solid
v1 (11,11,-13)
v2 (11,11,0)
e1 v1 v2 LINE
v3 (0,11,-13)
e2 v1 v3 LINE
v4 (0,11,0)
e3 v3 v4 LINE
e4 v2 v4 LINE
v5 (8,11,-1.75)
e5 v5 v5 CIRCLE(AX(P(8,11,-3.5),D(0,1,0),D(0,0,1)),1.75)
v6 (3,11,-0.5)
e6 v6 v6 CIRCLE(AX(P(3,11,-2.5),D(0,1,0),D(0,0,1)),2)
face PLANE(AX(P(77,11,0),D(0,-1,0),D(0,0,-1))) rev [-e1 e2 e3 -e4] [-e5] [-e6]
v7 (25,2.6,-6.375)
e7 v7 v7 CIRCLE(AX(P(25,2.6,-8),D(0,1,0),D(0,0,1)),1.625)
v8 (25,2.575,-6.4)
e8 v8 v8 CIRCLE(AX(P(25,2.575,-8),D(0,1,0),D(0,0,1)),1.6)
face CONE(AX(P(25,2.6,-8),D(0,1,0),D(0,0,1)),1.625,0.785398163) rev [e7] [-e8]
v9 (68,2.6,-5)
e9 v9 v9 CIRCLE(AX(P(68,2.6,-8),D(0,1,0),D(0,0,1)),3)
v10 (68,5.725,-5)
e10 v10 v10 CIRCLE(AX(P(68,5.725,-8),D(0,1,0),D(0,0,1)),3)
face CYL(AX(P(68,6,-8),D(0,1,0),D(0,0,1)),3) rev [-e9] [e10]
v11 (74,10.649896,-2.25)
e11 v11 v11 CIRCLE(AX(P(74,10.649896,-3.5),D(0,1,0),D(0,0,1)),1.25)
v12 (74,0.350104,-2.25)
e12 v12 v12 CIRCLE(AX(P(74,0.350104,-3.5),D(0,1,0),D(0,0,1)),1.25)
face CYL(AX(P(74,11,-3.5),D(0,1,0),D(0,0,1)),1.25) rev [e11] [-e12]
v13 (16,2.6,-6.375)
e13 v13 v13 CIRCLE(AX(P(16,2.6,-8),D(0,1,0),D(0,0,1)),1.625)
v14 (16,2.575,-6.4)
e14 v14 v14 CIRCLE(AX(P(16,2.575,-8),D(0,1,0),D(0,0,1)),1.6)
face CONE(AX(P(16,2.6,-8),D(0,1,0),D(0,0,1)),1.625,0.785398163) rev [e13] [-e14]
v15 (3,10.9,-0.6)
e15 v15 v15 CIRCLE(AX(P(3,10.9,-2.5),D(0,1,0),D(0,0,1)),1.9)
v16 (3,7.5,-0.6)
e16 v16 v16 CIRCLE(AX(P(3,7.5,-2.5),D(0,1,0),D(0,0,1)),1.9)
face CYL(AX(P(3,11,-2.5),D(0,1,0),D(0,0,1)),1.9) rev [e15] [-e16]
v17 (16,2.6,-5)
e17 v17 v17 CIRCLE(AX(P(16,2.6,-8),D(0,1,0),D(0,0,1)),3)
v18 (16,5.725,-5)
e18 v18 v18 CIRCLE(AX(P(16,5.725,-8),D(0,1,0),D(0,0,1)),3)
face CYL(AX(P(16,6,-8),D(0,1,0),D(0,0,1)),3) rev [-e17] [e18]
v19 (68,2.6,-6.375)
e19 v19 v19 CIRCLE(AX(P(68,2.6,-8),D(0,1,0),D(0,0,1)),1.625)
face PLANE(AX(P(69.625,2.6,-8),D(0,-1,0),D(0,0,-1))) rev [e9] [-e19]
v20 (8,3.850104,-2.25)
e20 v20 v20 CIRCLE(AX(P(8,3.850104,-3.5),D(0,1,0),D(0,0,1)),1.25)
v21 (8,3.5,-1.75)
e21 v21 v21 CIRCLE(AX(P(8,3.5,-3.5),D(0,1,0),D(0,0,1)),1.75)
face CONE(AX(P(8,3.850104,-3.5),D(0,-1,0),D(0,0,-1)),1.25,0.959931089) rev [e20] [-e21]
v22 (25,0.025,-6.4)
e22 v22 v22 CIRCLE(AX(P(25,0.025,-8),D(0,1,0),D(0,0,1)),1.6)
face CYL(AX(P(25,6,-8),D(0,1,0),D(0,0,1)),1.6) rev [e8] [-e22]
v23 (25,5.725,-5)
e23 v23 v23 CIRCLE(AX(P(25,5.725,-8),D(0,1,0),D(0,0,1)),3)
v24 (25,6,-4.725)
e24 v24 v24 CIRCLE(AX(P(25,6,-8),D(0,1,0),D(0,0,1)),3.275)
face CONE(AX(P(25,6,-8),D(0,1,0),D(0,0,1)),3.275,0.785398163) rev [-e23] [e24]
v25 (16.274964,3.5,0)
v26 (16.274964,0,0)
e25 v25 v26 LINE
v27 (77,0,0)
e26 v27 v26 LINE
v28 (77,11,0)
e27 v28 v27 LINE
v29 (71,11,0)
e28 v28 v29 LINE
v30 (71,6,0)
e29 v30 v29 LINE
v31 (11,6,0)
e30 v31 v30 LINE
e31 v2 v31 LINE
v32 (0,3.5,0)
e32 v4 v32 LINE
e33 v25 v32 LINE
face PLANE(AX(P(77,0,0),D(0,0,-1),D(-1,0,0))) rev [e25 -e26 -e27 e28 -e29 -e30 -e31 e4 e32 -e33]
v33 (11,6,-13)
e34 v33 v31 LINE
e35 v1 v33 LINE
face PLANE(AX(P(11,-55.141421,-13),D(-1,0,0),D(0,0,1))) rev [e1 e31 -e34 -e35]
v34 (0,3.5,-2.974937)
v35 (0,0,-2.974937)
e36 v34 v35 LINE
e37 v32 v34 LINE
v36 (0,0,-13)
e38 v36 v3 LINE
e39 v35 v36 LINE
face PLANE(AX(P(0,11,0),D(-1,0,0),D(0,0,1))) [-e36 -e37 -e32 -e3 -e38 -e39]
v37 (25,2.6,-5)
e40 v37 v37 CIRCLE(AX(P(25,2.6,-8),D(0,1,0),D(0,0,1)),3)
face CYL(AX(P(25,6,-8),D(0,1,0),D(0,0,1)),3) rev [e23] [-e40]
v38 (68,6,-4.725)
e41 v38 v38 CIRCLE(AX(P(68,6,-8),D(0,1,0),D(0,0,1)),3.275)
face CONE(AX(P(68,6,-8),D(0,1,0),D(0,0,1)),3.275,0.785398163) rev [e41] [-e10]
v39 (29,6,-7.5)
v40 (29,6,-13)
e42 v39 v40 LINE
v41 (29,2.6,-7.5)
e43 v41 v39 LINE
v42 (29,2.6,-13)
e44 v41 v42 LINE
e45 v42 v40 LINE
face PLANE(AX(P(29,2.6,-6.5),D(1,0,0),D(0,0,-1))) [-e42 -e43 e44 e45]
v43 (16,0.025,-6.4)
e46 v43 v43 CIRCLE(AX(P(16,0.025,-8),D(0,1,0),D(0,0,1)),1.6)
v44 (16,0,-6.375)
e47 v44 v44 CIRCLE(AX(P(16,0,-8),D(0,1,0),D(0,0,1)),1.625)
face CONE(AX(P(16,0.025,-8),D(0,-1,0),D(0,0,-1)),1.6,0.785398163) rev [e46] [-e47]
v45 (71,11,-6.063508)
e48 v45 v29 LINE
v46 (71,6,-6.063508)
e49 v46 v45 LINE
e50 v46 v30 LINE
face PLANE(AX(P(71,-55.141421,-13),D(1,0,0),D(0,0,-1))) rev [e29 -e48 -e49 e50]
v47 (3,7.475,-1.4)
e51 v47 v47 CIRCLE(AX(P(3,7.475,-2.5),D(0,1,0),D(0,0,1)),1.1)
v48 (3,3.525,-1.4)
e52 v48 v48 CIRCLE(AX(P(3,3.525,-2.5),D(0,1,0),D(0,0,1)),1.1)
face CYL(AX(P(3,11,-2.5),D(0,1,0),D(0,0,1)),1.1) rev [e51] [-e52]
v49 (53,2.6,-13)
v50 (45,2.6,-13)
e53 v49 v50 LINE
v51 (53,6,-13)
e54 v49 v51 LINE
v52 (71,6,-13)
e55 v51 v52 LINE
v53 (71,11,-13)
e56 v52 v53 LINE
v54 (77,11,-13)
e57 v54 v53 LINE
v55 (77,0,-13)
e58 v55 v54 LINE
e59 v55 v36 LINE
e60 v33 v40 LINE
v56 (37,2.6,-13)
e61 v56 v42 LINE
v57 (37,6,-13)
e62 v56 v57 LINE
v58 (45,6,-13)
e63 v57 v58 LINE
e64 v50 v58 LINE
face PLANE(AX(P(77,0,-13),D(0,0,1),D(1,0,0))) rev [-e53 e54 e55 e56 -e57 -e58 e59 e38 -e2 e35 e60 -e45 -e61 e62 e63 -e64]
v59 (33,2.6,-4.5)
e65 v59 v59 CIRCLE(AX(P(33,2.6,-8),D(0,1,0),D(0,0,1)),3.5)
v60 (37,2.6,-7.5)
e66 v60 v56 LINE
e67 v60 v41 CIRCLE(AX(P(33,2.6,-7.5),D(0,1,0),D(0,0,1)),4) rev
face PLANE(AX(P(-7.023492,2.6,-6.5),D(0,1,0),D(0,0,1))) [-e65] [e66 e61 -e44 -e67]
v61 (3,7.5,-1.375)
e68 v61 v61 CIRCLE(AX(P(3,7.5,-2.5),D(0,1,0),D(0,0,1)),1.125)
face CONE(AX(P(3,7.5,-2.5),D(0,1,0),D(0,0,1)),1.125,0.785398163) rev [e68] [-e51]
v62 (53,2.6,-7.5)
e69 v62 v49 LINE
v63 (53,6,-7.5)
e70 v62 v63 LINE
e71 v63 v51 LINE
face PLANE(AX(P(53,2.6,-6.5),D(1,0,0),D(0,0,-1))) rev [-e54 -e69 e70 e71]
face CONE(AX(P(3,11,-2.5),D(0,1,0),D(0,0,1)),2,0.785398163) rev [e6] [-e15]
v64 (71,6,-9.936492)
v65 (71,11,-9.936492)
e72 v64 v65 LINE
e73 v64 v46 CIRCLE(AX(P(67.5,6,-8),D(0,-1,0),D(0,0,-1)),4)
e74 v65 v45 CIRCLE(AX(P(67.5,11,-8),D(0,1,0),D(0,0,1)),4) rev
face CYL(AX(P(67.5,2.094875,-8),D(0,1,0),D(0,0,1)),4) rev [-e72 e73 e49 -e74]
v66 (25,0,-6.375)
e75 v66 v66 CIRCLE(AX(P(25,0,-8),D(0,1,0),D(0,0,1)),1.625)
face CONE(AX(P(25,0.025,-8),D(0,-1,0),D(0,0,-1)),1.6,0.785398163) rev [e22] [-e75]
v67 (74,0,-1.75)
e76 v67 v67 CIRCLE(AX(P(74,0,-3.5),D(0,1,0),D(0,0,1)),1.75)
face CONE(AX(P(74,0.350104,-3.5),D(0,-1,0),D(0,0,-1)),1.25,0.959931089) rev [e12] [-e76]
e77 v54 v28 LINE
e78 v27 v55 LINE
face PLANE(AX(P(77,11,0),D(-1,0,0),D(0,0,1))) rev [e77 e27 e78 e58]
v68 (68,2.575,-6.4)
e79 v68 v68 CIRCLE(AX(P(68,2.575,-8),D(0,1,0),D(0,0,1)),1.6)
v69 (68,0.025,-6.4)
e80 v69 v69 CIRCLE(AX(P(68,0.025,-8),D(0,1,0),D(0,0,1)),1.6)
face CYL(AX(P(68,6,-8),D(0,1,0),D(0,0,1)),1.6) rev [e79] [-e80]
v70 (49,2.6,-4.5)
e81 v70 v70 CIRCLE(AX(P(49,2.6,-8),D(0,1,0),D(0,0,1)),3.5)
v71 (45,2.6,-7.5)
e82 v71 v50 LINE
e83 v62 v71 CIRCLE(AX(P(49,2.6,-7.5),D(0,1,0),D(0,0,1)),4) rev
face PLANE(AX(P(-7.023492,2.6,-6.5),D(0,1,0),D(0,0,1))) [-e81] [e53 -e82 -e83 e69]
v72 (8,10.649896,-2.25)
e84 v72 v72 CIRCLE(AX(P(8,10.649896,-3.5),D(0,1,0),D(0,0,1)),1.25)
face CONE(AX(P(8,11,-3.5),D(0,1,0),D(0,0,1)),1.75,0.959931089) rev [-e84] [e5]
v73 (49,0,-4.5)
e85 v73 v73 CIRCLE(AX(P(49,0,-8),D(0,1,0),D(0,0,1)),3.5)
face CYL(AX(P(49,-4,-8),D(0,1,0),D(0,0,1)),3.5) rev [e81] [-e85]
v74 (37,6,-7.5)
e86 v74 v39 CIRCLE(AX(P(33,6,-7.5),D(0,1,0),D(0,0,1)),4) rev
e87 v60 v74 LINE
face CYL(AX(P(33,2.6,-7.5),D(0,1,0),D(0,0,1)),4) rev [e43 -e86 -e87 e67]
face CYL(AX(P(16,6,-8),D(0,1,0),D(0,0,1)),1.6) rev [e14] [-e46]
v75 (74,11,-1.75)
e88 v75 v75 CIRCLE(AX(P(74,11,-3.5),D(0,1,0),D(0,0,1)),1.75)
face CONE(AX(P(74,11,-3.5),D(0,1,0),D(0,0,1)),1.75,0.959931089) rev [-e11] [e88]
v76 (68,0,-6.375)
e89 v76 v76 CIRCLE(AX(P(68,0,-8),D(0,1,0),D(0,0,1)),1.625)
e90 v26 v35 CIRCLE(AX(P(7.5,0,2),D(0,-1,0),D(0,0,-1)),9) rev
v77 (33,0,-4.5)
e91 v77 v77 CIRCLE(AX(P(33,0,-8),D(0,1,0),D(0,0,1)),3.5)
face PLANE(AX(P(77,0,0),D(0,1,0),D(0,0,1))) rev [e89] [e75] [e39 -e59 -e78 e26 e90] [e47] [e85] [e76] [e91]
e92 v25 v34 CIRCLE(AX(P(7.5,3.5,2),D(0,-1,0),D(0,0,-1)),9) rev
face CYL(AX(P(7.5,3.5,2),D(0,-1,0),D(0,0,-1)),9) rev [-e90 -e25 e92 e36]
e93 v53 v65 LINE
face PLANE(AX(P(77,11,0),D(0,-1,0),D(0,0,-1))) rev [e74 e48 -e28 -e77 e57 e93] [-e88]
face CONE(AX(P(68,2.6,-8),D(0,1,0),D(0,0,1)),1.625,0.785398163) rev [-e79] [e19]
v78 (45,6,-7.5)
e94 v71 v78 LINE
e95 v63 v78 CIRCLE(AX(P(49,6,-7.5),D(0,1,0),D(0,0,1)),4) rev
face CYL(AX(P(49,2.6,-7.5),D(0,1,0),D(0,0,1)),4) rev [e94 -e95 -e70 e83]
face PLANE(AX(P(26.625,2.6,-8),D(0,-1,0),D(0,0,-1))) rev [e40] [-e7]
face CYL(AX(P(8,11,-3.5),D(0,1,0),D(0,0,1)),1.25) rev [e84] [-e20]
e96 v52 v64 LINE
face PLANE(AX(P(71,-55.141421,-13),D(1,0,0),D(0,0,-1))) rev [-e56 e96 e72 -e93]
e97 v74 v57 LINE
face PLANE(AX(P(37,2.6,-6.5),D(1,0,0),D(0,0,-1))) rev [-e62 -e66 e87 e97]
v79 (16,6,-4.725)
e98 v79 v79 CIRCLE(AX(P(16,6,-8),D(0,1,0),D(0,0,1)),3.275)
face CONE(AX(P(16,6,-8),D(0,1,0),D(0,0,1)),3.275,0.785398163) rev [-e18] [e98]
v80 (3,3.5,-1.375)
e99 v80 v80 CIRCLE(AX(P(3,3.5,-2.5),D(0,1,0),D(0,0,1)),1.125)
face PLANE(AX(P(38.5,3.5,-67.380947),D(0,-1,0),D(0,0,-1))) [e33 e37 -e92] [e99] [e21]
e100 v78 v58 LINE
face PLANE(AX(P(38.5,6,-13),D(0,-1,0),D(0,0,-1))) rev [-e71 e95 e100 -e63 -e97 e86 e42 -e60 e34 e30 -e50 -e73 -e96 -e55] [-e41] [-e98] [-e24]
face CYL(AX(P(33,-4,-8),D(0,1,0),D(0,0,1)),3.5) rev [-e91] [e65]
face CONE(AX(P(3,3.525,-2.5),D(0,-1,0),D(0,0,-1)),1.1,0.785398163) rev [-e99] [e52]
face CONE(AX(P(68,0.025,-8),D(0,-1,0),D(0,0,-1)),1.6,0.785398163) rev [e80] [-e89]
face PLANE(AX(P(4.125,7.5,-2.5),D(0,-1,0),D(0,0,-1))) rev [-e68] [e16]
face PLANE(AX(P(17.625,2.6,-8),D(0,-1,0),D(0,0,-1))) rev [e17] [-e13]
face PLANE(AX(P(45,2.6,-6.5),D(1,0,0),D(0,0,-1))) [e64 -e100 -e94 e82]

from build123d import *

# Parameters (mm, degrees)
SKETCH_1_W                 = 13
SKETCH_1_H                 = 11
EXTRUDE_1_DEPTH            = 77
SKETCH_2_W                 = 60
SKETCH_2_H                 = 5
CUT_EXTRUDE_1_DEPTH        = 79.860636569
CUT_EXTRUDE_2_DEPTH        = 5
HOLE_WIZARD_M31_AT_2_COUNT = 2
HOLE_WIZARD_M31_AT_2_PITCH = 52
HOLE_WIZARD_M31_AT_3_COUNT = 2
HOLE_WIZARD_M31_AT_3_PITCH = 9
CUT_EXTRUDE_3_DEPTH        = 3.5
CUT_EXTRUDE_5_DEPTH        = 3.4
SKETCH_12_R                = 3.5
CUT_EXTRUDE_6_DEPTH        = 10


# Read off the part's stored shape, not the designer's step: Отверстие обработанное метчиком M32
with BuildPart() as part:
    # Эскиз1 → Бобышка-Вытянуть1 (new body)
    with BuildSketch(Plane(origin=(0, 0, 0), x_dir=(0, 0, -1), z_dir=(1, 0, 0))):
        with Locations((6.5, 5.5)):
            Rectangle(SKETCH_1_W, SKETCH_1_H)
    extrude(amount=EXTRUDE_1_DEPTH)

    # Эскиз2 → Вырез-Вытянуть1 (cut, through all)
    with BuildSketch(Plane.XY):
        with Locations((41, 8.5)):
            Rectangle(SKETCH_2_W, SKETCH_2_H)
    extrude(amount=-CUT_EXTRUDE_1_DEPTH, mode=Mode.SUBTRACT)

    # Эскиз5 → Вырез-Вытянуть2 (cut)
    with BuildSketch(Plane(origin=(0, 11, 0), x_dir=(1, 0, 0), z_dir=(0, 1, 0))):
        with BuildLine():
            ThreePointArc((71, 6.063508327), (71.5, 8), (71, 9.936491673))
            Line((71, 9.936491673), (71, 6.063508327))
        make_face()
    extrude(amount=-CUT_EXTRUDE_2_DEPTH, mode=Mode.SUBTRACT)

    # Эскиз3 → Цековка для винта с внутренним шестигранником M31 (revolve, cut)
    with BuildSketch(Plane(origin=(16, 6, -8), x_dir=(0, 0, 1), z_dir=(1, 0, 0))):
        Polygon((0, 0), (0, 6), (1.625, 6), (1.6, 5.975), (1.6, 3.425), (1.625, 3.4), (3, 3.4), (3, 0.275), (3.275, 0), align=None)
    hole_wizard_m31 = revolve(axis=Axis((16, 12.35, -8), (0, -1, 0)), mode=Mode.SUBTRACT)

    # Цековка для винта с внутренним шестигранником M31 at 2: Цековка для винта с внутренним шестигранником M31 ×2
    with Locations(*[(i * HOLE_WIZARD_M31_AT_2_PITCH, 0, 0) for i in range(1, HOLE_WIZARD_M31_AT_2_COUNT)]):
        add(hole_wizard_m31, mode=Mode.SUBTRACT)

    # Цековка для винта с внутренним шестигранником M31 at 3: Цековка для винта с внутренним шестигранником M31 ×2
    with Locations(*[(i * HOLE_WIZARD_M31_AT_3_PITCH, 0, 0) for i in range(1, HOLE_WIZARD_M31_AT_3_COUNT)]):
        add(hole_wizard_m31, mode=Mode.SUBTRACT)

    # Эскиз8 → Вырез-Вытянуть3 (cut)
    with BuildSketch(Plane.XZ):
        with BuildLine():
            ThreePointArc((0, -2.974937186), (9.118315903, -6.853307497), (16.274964387, 0))
            Line((16.274964387, 0), (0, 0))
            Line((0, 0), (0, -2.974937186))
        make_face()
    extrude(amount=-CUT_EXTRUDE_3_DEPTH, mode=Mode.SUBTRACT)

    # Эскиз9 → Вырез-Вытянуть5 (cut)
    with BuildSketch(Plane.XZ.offset(-6)):
        with BuildLine():
            ThreePointArc((37, -7.5), (33, -3.5), (29, -7.5))
            Line((29, -7.5), (29, -13))
            Line((29, -13), (37, -13))
            Line((37, -13), (37, -7.5))
        make_face()
        with BuildLine():
            Line((45, -7.5), (45, -13))
            Line((45, -13), (53, -13))
            Line((53, -13), (53, -7.5))
            ThreePointArc((53, -7.5), (49, -3.5), (45, -7.5))
        make_face()
    extrude(amount=CUT_EXTRUDE_5_DEPTH, mode=Mode.SUBTRACT)

    # Отверстие обработанное метчиком M32 outline → Отверстие обработанное метчиком M32 (revolve, cut)
    with BuildSketch(Plane(origin=(74, 0, -3.5), x_dir=(1, 0, 0), z_dir=(0, 0, 1))):
        Polygon((0, 0), (1.75, 0), (1.25, 0.350103769), (1.25, 10.649896231), (1.75, 11), (0, 11), align=None)
    revolve(axis=Axis((74, 0, -3.5), (0, 1, 0)), mode=Mode.SUBTRACT)

    # Hole Wizard M32 2 outline → Hole Wizard M32 2 (revolve, cut)
    with BuildSketch(Plane(origin=(8, 0, -3.5), x_dir=(1, 0, 0), z_dir=(0, 0, 1))):
        Polygon((0, 3.5), (1.75, 3.5), (1.25, 3.850103769), (1.25, 10.649896231), (1.75, 11), (0, 11), align=None)
    revolve(axis=Axis((8, 0, -3.5), (0, 1, 0)), mode=Mode.SUBTRACT)

    # Эскиз10 → Цековка для винта с внутренним шестигранником M21 (revolve, cut)
    with BuildSketch(Plane(origin=(3, 11, -2.5), x_dir=(0, 0, 1), z_dir=(1, 0, 0))):
        Polygon((0, 0), (0, 7.5), (1.125, 7.5), (1.1, 7.475), (1.1, 3.525), (1.125, 3.5), (1.9, 3.5), (1.9, 0.1), (2, 0), align=None)
    revolve(axis=Axis((3, 17.35, -2.5), (0, -1, 0)), mode=Mode.SUBTRACT)

    # Эскиз12 → Вырез-Вытянуть6 (cut)
    with BuildSketch(Plane(origin=(0, 6, 0), x_dir=(1, 0, 0), z_dir=(0, 1, 0))):
        with Locations(Location((33, 8, 0), (0, 0, 270))):
            Circle(SKETCH_12_R)
        with Locations(Location((49, 8, 0), (0, 0, 270))):
            Circle(SKETCH_12_R)
    extrude(amount=-CUT_EXTRUDE_6_DEPTH, mode=Mode.SUBTRACT)


solid = part.part
